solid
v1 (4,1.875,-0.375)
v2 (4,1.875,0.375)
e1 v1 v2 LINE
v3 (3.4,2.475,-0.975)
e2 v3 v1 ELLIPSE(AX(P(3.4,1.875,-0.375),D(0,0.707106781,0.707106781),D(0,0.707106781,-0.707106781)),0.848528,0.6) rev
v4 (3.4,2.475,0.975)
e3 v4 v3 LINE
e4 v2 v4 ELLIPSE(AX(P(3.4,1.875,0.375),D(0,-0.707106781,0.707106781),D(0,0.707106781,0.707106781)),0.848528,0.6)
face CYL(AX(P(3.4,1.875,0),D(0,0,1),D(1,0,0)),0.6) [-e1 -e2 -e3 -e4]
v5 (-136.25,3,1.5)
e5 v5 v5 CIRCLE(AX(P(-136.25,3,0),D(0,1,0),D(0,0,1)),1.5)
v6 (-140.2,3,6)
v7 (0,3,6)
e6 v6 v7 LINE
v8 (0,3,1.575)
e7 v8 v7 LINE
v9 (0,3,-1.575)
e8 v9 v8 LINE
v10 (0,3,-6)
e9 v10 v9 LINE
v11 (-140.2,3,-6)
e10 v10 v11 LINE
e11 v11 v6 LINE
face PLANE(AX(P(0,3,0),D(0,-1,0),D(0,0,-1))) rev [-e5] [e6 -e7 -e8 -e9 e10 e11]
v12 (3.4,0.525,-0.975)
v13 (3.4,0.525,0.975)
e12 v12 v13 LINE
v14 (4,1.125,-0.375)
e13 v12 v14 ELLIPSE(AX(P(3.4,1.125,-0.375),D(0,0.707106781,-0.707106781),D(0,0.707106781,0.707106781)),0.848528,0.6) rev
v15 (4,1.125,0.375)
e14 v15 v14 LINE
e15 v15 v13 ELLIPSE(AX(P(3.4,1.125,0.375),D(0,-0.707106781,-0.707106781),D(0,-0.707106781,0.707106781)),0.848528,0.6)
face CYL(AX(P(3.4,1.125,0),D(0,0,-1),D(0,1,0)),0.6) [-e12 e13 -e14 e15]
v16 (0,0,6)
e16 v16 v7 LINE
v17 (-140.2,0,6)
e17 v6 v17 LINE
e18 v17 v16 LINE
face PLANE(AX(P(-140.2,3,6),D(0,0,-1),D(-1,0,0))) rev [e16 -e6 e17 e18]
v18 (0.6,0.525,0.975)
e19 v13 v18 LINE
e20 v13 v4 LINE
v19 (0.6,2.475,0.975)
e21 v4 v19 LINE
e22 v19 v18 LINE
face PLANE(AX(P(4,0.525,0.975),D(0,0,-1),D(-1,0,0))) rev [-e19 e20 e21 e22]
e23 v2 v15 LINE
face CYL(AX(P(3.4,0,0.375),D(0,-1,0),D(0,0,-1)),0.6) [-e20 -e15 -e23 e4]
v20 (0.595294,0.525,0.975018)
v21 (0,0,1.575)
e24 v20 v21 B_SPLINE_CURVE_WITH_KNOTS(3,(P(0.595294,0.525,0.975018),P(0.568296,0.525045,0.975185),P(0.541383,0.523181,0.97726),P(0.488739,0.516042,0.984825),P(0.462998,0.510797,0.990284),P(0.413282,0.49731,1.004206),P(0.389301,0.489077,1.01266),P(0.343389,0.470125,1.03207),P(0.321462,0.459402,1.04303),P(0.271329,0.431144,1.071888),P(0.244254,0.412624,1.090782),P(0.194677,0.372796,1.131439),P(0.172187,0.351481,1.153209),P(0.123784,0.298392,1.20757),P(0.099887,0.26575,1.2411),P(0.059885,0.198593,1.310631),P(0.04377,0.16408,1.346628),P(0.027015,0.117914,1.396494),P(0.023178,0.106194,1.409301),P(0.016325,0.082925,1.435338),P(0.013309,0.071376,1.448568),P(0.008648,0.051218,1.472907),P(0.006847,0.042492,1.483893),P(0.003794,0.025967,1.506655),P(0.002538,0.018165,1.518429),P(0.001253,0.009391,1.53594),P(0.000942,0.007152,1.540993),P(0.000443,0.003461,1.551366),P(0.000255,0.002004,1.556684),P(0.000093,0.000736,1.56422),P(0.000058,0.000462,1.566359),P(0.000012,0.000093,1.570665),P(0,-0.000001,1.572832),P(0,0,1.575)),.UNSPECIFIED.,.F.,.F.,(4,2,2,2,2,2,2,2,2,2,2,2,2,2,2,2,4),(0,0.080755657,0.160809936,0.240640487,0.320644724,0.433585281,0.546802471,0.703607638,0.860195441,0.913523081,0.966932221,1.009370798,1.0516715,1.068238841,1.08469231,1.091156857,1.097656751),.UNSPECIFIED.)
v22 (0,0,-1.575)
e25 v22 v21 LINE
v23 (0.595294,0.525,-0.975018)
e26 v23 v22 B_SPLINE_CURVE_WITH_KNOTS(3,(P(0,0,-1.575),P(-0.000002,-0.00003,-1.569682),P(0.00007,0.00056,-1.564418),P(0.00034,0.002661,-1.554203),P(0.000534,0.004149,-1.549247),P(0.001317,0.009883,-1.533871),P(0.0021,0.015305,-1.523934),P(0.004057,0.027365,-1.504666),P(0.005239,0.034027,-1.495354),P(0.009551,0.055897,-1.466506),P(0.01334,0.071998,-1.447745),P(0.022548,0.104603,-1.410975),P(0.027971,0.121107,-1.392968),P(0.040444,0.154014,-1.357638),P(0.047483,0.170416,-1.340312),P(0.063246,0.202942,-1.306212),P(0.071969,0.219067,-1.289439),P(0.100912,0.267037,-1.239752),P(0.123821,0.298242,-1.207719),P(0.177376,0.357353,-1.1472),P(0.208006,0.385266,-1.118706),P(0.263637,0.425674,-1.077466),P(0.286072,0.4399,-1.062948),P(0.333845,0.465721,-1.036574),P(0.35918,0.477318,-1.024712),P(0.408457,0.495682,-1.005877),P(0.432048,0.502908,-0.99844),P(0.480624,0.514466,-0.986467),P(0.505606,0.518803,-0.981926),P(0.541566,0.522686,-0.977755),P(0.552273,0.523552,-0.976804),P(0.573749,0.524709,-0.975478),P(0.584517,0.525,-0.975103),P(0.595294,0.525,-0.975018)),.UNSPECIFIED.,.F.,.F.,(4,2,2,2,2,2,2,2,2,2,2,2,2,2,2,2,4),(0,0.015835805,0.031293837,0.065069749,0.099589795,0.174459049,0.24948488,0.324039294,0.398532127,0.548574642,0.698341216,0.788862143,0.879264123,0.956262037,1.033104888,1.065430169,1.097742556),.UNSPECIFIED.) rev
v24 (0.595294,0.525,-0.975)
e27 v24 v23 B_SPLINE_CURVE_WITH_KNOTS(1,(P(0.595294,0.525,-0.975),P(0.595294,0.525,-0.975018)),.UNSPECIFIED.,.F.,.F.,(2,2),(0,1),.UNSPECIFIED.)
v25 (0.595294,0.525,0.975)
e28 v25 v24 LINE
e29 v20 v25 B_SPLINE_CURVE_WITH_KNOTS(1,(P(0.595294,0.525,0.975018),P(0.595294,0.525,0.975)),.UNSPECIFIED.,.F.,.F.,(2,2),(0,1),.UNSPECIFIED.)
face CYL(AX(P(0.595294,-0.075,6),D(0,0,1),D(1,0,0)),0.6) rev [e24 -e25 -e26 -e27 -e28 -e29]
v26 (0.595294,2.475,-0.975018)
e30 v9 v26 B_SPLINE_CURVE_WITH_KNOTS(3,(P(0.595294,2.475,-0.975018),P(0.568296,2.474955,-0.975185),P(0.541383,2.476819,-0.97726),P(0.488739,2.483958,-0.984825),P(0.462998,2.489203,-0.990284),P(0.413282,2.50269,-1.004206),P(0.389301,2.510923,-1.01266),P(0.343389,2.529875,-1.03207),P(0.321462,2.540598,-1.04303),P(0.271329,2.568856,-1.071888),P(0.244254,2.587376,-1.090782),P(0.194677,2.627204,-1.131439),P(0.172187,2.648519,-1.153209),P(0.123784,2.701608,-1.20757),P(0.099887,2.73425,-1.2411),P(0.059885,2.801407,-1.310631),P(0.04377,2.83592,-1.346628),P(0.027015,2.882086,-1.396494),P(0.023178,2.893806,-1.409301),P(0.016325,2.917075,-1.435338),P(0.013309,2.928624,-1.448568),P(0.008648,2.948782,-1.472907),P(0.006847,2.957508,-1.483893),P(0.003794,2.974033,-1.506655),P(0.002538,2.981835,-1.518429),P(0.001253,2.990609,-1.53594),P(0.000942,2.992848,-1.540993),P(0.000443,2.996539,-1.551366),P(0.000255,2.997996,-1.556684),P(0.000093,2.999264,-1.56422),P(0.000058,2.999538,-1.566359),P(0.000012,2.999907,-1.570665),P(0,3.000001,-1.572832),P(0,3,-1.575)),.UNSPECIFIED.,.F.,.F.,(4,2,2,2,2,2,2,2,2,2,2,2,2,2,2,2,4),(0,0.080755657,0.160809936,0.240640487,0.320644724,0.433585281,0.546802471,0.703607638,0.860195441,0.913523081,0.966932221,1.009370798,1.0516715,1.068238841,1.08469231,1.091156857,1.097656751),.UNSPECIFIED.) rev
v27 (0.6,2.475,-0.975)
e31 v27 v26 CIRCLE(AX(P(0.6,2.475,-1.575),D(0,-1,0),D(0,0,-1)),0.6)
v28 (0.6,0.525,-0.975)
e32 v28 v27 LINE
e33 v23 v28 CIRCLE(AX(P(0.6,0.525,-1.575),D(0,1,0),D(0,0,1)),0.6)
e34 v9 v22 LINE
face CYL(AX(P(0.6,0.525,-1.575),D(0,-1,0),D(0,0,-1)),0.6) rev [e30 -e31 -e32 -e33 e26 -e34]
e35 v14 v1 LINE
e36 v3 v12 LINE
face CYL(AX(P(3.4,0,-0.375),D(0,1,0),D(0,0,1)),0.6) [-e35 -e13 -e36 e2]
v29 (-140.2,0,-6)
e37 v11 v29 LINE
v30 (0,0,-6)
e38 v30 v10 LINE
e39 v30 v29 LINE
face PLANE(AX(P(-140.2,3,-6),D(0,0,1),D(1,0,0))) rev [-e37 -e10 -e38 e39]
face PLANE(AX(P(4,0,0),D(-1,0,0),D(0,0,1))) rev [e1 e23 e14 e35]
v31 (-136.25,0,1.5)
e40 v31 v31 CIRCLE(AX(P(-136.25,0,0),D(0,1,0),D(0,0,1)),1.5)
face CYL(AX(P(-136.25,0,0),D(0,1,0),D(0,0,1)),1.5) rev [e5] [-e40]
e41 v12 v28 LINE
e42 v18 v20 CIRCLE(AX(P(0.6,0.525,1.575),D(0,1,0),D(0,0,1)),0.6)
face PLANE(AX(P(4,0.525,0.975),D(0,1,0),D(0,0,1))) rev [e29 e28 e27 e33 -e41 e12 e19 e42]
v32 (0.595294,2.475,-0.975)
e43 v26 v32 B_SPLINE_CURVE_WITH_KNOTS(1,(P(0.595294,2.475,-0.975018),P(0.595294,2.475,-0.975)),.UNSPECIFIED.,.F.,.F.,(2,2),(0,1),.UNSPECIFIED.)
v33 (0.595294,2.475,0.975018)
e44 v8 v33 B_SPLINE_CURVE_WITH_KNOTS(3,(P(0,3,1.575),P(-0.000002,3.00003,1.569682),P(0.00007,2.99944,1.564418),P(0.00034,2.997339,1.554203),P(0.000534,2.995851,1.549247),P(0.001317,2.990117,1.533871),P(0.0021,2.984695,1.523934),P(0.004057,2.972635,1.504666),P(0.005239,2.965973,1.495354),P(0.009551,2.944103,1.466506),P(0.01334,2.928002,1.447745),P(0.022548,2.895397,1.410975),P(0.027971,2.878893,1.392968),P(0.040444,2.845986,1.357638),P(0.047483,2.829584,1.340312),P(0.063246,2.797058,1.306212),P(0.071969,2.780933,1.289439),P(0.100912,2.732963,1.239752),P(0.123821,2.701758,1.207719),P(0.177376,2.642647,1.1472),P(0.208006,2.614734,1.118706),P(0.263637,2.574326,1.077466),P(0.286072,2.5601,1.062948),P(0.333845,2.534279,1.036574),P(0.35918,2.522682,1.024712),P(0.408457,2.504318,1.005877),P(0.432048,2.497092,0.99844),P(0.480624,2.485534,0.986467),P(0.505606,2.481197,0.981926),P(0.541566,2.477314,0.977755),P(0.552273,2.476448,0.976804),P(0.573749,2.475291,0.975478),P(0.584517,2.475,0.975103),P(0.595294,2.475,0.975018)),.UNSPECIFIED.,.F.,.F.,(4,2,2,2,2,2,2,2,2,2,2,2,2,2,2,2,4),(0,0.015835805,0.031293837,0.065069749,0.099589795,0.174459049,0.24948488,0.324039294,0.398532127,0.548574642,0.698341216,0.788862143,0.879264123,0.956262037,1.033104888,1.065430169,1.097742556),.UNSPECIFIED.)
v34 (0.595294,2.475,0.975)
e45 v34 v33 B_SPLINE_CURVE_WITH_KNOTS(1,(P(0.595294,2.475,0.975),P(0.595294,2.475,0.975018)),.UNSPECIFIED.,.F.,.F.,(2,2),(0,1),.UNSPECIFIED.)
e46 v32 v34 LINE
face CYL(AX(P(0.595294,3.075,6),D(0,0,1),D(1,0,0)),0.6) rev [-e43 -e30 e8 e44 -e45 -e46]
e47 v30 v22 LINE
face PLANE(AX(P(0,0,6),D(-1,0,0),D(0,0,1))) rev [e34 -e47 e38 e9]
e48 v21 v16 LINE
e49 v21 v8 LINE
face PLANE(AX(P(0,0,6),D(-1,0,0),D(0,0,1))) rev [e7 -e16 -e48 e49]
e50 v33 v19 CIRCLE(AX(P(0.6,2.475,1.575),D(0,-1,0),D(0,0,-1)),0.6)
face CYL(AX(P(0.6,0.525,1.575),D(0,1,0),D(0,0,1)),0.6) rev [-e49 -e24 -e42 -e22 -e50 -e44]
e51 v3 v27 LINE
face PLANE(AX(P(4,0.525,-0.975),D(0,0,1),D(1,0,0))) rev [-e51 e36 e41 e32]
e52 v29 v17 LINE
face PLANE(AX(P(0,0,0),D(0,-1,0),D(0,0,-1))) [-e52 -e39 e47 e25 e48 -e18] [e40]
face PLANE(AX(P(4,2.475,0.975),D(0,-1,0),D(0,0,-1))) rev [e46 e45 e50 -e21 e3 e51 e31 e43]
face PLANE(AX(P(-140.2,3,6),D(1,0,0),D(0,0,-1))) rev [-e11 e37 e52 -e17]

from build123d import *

# Parameters (mm, degrees)
SKETCH1_W           = 280.4
SKETCH1_H           = 12
BOSS_EXTRUDE1_DEPTH = 3
SKETCH3_R           = 1.5
CUT_EXTRUDE1_DEPTH  = 141.360393274
SKETCH6_W           = 140.2
SKETCH6_H           = 12
CUT_EXTRUDE2_DEPTH  = 141.360393274
SKETCH7_W           = 1.95
SKETCH7_H           = 1.95
BOSS_EXTRUDE2_DEPTH = 4
FILLET1_R           = 0.6


with BuildPart() as part:
    # Sketch1 → Boss-Extrude1 (new body)
    with BuildSketch(Plane(origin=(0, 0, 0), x_dir=(1, 0, 0), z_dir=(0, 1, 0))):
        Rectangle(SKETCH1_W, SKETCH1_H)
    extrude(amount=BOSS_EXTRUDE1_DEPTH)

    # Sketch3 → Cut-Extrude1 (cut, through all)
    with BuildSketch(Plane(origin=(0, 3, 0), x_dir=(1, 0, 0), z_dir=(0, 1, 0))):
        with Locations(Location((-136.25, 0, 0), (0, 0, 270))):
            Circle(SKETCH3_R)
        with Locations(Location((136.25, 0, 0), (0, 0, 270))):
            Circle(SKETCH3_R)
    extrude(amount=-CUT_EXTRUDE1_DEPTH, mode=Mode.SUBTRACT)

    # Sketch6 → Cut-Extrude2 (cut, through all)
    with BuildSketch(Plane(origin=(0, 3, 0), x_dir=(1, 0, 0), z_dir=(0, 1, 0))):
        with Locations((70.1, 0)):
            Rectangle(SKETCH6_W, SKETCH6_H)
    extrude(amount=-CUT_EXTRUDE2_DEPTH, mode=Mode.SUBTRACT)

    # Sketch7 → Boss-Extrude2 (add)
    with BuildSketch(Plane(origin=(0, 0, 0), x_dir=(0, 0, -1), z_dir=(1, 0, 0))):
        with Locations((0, 1.5)):
            Rectangle(SKETCH7_W, SKETCH7_H)
    extrude(amount=BOSS_EXTRUDE2_DEPTH)

    # Fillet1
    # the kernel refuses this fillet: 0.6 mm, written as the material it adds along each edge
    with BuildSketch(Plane(origin=(0, 0.525, -0.975), x_dir=(0, 0, -1), z_dir=(0, 1, 0)), Plane(origin=(0, 2.475, 0.975), x_dir=(0, 0, 1), z_dir=(0, -1, 0))) as fillet1_piece_1:
        with BuildLine():
            CenterArc((FILLET1_R, -FILLET1_R), FILLET1_R, 90, 90)
            Line((0, -FILLET1_R), (0, 0))
            Line((0, 0), (FILLET1_R, 0))
        make_face()
    fillet1_piece_1_solid = extrude(amount=1.95, mode=Mode.PRIVATE)
    with BuildSketch(Plane(origin=(0, 2.475, -0.975), x_dir=(0, 1, 0), z_dir=(0, 0, 1)), Plane(origin=(0, 0.525, 0.975), x_dir=(0, -1, 0), z_dir=(0, 0, -1))) as fillet1_piece_2:
        with BuildLine():
            CenterArc((0.6, -0.595294045), FILLET1_R, 97.180755781, 82.819244219)
            Line((0, -0.595294045), (0, 0))
            Line((0, 0), (0.525, 0))
        make_face()
    fillet1_piece_2_solid = extrude(amount=1.95, mode=Mode.PRIVATE)
    with BuildSketch(Plane(origin=(0, -0.975, -0.975), x_dir=(0, 0, -1), z_dir=(0, 1, 0))) as fillet1_piece_3a_section:
        with BuildLine():
            CenterArc((FILLET1_R, -FILLET1_R), FILLET1_R, 90, 90)
            Line((0, -FILLET1_R), (0, 0))
            Line((0, 0), (FILLET1_R, 0))
        make_face()
    fillet1_piece_3a = extrude(amount=3.45, mode=Mode.PRIVATE)
    fillet1_piece_3a = split(fillet1_piece_3a, bisect_by=Plane(origin=(0, 0, -0.975), z_dir=(0, 1, 0)), keep=Keep.TOP, mode=Mode.PRIVATE)
    fillet1_piece_3a = split(fillet1_piece_3a, bisect_by=Plane(origin=(0, 0.525, -0.975), z_dir=(0, -1, 0)), keep=Keep.TOP, mode=Mode.PRIVATE)
    with BuildSketch(Plane(origin=(0, 0.525, 0.975), x_dir=(0, -1, 0), z_dir=(0, 0, -1))) as fillet1_piece_3b_section:
        with BuildLine():
            CenterArc((0.6, -0.595294045), FILLET1_R, 97.180755781, 82.819244219)
            Line((0, -0.595294045), (0, 0))
            Line((0, 0), (0.525, 0))
        make_face()
    fillet1_piece_3b = extrude(amount=3.438235112, mode=Mode.PRIVATE)
    fillet1_piece_3b = split(fillet1_piece_3b, bisect_by=Plane(origin=(0, 0.525, -0.975), z_dir=(0, 0, -1)), keep=Keep.TOP, mode=Mode.PRIVATE)
    fillet1_piece_3 = fillet1_piece_3a & fillet1_piece_3b
    with BuildSketch(Plane(origin=(0, 2.475, -2.463235112), x_dir=(0, 1, 0), z_dir=(0, 0, 1))) as fillet1_piece_4a_section:
        with BuildLine():
            CenterArc((0.6, -0.595294045), FILLET1_R, 97.180755781, 82.819244219)
            Line((0, -0.595294045), (0, 0))
            Line((0, 0), (0.525, 0))
        make_face()
    fillet1_piece_4a = extrude(amount=3.438235112, mode=Mode.PRIVATE)
    fillet1_piece_4a = split(fillet1_piece_4a, bisect_by=Plane(origin=(0, 2.475, -0.975), z_dir=(0, 0, -1)), keep=Keep.TOP, mode=Mode.PRIVATE)
    with BuildSketch(Plane(origin=(0, 0.525, -0.975), x_dir=(0, 0, -1), z_dir=(0, 1, 0))) as fillet1_piece_4b_section:
        with BuildLine():
            CenterArc((FILLET1_R, -FILLET1_R), FILLET1_R, 90, 90)
            Line((0, -FILLET1_R), (0, 0))
            Line((0, 0), (FILLET1_R, 0))
        make_face()
    fillet1_piece_4b = extrude(amount=3.45, mode=Mode.PRIVATE)
    fillet1_piece_4b = split(fillet1_piece_4b, bisect_by=Plane(origin=(0, 3, -0.975), z_dir=(0, -1, 0)), keep=Keep.TOP, mode=Mode.PRIVATE)
    fillet1_piece_4b = split(fillet1_piece_4b, bisect_by=Plane(origin=(0, 2.475, -0.975), z_dir=(0, 1, 0)), keep=Keep.TOP, mode=Mode.PRIVATE)
    fillet1_piece_4 = fillet1_piece_4a & fillet1_piece_4b
    with BuildSketch(Plane(origin=(0, 3.975, 0.975), x_dir=(0, 0, 1), z_dir=(0, -1, 0))) as fillet1_piece_5a_section:
        with BuildLine():
            CenterArc((FILLET1_R, -FILLET1_R), FILLET1_R, 90, 90)
            Line((0, -FILLET1_R), (0, 0))
            Line((0, 0), (FILLET1_R, 0))
        make_face()
    fillet1_piece_5a = extrude(amount=3.45, mode=Mode.PRIVATE)
    fillet1_piece_5a = split(fillet1_piece_5a, bisect_by=Plane(origin=(0, 3, 0.975), z_dir=(0, -1, 0)), keep=Keep.TOP, mode=Mode.PRIVATE)
    fillet1_piece_5a = split(fillet1_piece_5a, bisect_by=Plane(origin=(0, 2.475, 0.975), z_dir=(0, 1, 0)), keep=Keep.TOP, mode=Mode.PRIVATE)
    with BuildSketch(Plane(origin=(0, 2.475, -0.975), x_dir=(0, 1, 0), z_dir=(0, 0, 1))) as fillet1_piece_5b_section:
        with BuildLine():
            CenterArc((0.6, -0.595294045), FILLET1_R, 97.180755781, 82.819244219)
            Line((0, -0.595294045), (0, 0))
            Line((0, 0), (0.525, 0))
        make_face()
    fillet1_piece_5b = extrude(amount=3.438235112, mode=Mode.PRIVATE)
    fillet1_piece_5b = split(fillet1_piece_5b, bisect_by=Plane(origin=(0, 2.475, 0.975), z_dir=(0, 0, 1)), keep=Keep.TOP, mode=Mode.PRIVATE)
    fillet1_piece_5 = fillet1_piece_5a & fillet1_piece_5b
    with BuildSketch(Plane(origin=(0, 2.475, 0.975), x_dir=(0, 0, 1), z_dir=(0, -1, 0))) as fillet1_piece_6a_section:
        with BuildLine():
            CenterArc((FILLET1_R, -FILLET1_R), FILLET1_R, 90, 90)
            Line((0, -FILLET1_R), (0, 0))
            Line((0, 0), (FILLET1_R, 0))
        make_face()
    fillet1_piece_6a = extrude(amount=3.45, mode=Mode.PRIVATE)
    fillet1_piece_6a = split(fillet1_piece_6a, bisect_by=Plane(origin=(0, 0, 0.975), z_dir=(0, 1, 0)), keep=Keep.TOP, mode=Mode.PRIVATE)
    fillet1_piece_6a = split(fillet1_piece_6a, bisect_by=Plane(origin=(0, 0.525, 0.975), z_dir=(0, -1, 0)), keep=Keep.TOP, mode=Mode.PRIVATE)
    with BuildSketch(Plane(origin=(0, 0.525, 2.463235112), x_dir=(0, -1, 0), z_dir=(0, 0, -1))) as fillet1_piece_6b_section:
        with BuildLine():
            CenterArc((0.6, -0.595294045), FILLET1_R, 97.180755781, 82.819244219)
            Line((0, -0.595294045), (0, 0))
            Line((0, 0), (0.525, 0))
        make_face()
    fillet1_piece_6b = extrude(amount=3.438235112, mode=Mode.PRIVATE)
    fillet1_piece_6b = split(fillet1_piece_6b, bisect_by=Plane(origin=(0, 0.525, 0.975), z_dir=(0, 0, 1)), keep=Keep.TOP, mode=Mode.PRIVATE)
    fillet1_piece_6 = fillet1_piece_6a & fillet1_piece_6b
    add([fillet1_piece_1_solid, fillet1_piece_2_solid, fillet1_piece_3, fillet1_piece_4, fillet1_piece_5, fillet1_piece_6])
    # the kernel refuses this fillet: 0.6 mm, written as the material it takes off along each edge
    with BuildSketch(Plane(origin=(4, -0.975, -0.975), x_dir=(0, 0, 1), z_dir=(0, 1, 0)), Plane(origin=(4, 2.475, -2.475), x_dir=(0, -1, 0), z_dir=(0, 0, 1)), Plane(origin=(4, 0.525, 2.475), x_dir=(0, 1, 0), z_dir=(0, 0, -1))) as fillet1_2_piece_1:
        with BuildLine():
            CenterArc((FILLET1_R, -FILLET1_R), FILLET1_R, 90, 90)
            Line((0, -FILLET1_R), (0, 0))
            Line((0, 0), (FILLET1_R, 0))
        make_face()
    fillet1_2_piece_1_solid = extrude(amount=4.95, mode=Mode.PRIVATE)
    with BuildSketch(Plane(origin=(4, 3.975, 0.975), x_dir=(-1, 0, 0), z_dir=(0, -1, 0))) as fillet1_2_piece_2:
        with BuildLine():
            CenterArc((FILLET1_R, FILLET1_R), FILLET1_R, 180, 90)
            Line((0, FILLET1_R), (0, 0))
            Line((0, 0), (FILLET1_R, 0))
        make_face()
    fillet1_2_piece_2_solid = extrude(amount=4.95, mode=Mode.PRIVATE)
    add([fillet1_2_piece_1_solid, fillet1_2_piece_2_solid], mode=Mode.SUBTRACT)


solid = part.part
